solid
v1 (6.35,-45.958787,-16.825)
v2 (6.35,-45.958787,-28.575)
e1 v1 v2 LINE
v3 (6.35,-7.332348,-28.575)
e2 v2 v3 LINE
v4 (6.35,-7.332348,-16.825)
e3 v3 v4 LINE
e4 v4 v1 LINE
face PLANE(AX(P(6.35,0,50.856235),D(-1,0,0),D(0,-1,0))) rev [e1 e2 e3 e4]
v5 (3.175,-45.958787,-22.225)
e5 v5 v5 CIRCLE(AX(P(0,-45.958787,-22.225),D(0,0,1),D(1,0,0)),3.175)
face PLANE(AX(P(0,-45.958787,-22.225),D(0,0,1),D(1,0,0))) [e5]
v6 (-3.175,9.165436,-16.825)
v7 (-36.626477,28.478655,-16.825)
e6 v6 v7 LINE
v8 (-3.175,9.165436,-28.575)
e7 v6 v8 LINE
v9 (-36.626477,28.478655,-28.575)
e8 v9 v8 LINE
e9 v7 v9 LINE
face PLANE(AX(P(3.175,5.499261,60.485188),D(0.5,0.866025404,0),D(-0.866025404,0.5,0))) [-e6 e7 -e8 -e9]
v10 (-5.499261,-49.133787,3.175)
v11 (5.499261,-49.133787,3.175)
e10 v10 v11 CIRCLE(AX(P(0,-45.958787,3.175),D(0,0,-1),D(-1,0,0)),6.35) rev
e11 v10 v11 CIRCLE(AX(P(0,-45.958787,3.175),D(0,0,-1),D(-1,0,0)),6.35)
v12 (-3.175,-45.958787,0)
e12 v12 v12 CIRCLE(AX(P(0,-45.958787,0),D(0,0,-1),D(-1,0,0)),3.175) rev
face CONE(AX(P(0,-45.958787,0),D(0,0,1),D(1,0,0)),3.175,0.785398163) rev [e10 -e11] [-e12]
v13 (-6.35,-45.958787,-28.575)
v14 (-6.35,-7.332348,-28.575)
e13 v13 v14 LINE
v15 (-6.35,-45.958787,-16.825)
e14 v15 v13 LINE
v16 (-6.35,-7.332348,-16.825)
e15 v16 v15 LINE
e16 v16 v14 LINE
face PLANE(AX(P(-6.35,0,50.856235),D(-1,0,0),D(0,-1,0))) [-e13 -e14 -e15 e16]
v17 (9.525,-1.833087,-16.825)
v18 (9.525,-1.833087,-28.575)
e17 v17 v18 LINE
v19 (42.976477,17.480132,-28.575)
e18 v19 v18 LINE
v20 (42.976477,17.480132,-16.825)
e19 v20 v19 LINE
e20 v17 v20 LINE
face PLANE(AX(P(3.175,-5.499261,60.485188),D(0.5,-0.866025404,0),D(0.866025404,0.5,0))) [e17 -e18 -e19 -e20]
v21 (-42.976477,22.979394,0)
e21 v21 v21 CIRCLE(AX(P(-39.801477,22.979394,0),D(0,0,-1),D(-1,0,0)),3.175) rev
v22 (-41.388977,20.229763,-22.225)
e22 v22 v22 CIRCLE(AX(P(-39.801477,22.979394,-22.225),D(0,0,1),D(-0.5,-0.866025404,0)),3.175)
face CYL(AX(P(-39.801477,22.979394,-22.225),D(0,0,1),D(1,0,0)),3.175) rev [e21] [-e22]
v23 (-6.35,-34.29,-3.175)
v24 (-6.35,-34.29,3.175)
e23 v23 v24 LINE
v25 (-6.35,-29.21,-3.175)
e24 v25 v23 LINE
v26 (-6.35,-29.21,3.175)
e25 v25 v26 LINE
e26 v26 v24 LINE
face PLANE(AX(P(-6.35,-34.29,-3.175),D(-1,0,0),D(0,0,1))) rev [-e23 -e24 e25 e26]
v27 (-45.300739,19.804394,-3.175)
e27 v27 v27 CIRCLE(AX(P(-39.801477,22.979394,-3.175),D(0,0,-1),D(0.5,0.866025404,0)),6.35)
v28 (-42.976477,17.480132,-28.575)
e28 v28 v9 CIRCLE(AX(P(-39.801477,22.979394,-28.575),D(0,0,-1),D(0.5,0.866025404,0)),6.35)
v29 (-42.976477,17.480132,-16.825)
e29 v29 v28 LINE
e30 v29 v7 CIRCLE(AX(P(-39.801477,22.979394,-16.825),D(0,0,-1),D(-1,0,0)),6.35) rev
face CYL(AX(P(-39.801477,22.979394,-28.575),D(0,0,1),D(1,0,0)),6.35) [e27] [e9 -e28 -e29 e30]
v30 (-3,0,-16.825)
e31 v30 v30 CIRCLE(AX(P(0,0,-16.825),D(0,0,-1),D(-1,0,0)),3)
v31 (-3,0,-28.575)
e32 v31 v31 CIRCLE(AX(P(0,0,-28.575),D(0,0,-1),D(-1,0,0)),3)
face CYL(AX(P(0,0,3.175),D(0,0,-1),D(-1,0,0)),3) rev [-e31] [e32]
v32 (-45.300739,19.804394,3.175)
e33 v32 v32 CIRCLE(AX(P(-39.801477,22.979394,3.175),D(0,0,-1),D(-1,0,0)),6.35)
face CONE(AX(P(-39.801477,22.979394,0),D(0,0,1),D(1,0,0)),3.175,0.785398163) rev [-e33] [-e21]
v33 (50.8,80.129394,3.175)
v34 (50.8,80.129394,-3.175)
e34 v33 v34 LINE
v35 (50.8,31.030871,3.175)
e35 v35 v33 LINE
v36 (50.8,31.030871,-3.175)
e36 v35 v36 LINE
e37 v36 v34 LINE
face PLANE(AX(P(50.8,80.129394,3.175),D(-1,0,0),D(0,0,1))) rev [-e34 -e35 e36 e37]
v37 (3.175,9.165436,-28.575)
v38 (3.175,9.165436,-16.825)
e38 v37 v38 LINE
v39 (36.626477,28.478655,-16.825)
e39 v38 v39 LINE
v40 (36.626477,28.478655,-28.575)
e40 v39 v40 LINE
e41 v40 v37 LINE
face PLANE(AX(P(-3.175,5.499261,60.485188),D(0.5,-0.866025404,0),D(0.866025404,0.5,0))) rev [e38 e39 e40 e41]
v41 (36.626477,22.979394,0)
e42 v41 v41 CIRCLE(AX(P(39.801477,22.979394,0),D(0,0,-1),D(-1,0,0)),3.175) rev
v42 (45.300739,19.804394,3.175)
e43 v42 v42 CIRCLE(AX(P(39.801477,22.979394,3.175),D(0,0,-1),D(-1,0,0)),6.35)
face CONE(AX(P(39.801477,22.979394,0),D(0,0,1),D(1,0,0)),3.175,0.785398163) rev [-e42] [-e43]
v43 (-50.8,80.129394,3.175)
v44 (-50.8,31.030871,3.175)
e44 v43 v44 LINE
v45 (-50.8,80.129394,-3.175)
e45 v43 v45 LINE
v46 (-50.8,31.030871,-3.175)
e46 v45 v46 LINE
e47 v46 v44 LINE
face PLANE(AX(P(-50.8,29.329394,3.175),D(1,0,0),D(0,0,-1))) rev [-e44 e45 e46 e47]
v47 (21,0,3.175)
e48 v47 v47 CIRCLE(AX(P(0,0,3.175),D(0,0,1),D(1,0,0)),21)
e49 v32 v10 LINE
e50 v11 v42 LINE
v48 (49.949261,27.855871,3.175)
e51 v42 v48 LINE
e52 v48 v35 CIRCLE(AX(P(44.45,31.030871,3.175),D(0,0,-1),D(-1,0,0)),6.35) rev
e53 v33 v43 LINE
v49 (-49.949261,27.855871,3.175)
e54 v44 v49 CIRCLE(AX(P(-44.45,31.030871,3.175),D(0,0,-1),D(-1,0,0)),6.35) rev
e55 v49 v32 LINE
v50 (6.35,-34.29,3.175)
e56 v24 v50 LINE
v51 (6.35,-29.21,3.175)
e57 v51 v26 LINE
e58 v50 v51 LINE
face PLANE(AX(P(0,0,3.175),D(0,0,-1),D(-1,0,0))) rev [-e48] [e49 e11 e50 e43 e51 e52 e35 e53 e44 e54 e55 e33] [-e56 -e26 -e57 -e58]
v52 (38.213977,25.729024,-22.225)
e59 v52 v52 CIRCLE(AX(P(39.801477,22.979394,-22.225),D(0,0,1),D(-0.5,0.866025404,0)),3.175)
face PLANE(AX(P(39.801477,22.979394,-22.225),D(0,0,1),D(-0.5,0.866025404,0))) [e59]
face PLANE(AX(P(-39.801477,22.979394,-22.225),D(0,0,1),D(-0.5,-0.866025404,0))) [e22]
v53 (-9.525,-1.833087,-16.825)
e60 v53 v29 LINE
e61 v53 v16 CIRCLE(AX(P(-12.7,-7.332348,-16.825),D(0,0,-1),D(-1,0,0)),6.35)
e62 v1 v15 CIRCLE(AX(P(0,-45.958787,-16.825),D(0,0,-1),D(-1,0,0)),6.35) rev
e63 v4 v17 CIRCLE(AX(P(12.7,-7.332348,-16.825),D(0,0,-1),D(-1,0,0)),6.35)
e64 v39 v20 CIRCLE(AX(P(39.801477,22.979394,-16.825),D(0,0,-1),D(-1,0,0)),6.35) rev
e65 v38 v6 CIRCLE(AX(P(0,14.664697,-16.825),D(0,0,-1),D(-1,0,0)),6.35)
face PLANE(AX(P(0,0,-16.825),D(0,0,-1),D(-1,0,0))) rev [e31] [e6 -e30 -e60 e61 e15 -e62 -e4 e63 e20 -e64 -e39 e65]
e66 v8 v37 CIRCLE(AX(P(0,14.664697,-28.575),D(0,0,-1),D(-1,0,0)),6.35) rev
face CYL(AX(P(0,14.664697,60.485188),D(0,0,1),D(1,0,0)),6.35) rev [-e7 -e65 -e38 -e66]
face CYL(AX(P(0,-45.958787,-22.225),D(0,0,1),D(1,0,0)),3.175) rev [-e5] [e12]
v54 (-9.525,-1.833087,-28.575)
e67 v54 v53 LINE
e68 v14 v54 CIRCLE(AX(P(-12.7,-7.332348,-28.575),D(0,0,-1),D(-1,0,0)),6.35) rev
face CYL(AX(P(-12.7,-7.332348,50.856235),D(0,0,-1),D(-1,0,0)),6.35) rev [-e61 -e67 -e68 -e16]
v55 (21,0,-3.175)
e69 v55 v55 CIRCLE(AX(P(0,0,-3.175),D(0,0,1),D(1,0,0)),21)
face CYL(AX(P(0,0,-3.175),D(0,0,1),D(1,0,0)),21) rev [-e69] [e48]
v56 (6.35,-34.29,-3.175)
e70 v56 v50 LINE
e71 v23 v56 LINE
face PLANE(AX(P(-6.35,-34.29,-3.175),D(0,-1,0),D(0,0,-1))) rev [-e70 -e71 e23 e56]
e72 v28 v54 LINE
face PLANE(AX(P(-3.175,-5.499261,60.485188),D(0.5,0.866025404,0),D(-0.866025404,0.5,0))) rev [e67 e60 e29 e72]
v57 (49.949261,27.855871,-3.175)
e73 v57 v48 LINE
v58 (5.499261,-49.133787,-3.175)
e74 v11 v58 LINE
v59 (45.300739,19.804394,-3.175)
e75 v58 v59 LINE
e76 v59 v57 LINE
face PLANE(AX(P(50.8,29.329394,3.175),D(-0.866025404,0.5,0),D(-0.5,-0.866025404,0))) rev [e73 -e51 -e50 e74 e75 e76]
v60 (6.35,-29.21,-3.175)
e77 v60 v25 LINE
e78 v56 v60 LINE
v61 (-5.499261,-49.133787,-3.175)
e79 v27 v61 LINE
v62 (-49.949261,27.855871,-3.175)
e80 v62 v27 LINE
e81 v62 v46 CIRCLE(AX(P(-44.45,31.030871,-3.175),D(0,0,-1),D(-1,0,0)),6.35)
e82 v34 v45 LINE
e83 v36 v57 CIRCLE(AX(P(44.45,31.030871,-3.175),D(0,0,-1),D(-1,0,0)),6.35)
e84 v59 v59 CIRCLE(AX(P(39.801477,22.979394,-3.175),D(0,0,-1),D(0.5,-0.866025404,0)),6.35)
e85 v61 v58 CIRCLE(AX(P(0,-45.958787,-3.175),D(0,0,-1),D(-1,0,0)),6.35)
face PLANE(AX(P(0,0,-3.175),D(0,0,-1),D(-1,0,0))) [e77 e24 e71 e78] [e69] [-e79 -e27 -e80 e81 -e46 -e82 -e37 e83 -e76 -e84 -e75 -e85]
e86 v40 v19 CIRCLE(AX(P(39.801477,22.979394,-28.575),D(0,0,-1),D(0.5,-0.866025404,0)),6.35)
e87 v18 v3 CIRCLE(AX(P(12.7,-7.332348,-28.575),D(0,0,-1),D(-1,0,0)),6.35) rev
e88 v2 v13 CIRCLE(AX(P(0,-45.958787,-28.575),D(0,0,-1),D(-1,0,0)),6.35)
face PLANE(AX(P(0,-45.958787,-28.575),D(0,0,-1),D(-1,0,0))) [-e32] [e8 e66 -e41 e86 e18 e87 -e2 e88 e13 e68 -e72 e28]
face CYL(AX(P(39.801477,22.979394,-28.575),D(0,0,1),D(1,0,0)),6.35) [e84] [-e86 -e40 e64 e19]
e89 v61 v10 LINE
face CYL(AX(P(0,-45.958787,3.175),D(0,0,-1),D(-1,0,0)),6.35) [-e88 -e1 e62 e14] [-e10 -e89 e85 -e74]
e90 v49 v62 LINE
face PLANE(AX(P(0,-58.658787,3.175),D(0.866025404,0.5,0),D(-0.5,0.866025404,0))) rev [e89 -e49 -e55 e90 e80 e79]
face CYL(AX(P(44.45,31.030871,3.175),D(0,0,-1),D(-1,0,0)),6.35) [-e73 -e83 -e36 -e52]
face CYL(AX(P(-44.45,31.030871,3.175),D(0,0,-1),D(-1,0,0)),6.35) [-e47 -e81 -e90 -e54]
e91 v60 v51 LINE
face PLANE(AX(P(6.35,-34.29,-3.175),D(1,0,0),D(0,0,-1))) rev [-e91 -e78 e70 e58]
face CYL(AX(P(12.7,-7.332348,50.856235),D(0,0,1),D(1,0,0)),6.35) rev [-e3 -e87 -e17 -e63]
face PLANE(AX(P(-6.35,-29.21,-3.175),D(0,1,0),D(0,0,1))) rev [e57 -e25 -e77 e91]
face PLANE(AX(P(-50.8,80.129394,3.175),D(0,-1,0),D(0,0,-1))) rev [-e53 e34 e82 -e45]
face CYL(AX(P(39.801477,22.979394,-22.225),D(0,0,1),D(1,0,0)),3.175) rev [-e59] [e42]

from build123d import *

# Parameters (mm, degrees)
BOSS_EXTRUDE1_DEPTH          = 3.175
SKETCH2_R                    = 21
CUT_EXTRUDE1_DEPTH           = 96.087760678
FILLET1_R                    = 6.35
SKETCH3_W                    = 12.7
SKETCH3_H                    = 5.08
CUT_EXTRUDE2_DEPTH           = 96.087760678
SKETCH5_R                    = 6.35
BOSS_EXTRUDE3_DEPTH          = 25.4
SKETCH6_R                    = 3.175
CUT_EXTRUDE3_DEPTH           = 25.4
CHAMFER2_SIZE                = 3.175
BOSS_EXTRUDE4_START          = -11.75
BOSS_EXTRUDE4_DEPTH          = 11.75
CIRPATTERN2_COUNT            = 3
CHAMFER2_OF_CIRPATTERN2_SIZE = 3.175
FILLET2_R                    = 6.35
SKETCH9_R                    = 3
CUT_EXTRUDE4_DEPTH           = 101.047100061


with BuildPart() as part:
    # Sketch1 → Boss-Extrude1 (new, symmetric)
    with BuildSketch(Plane.XY):
        Polygon((0, -58.65878735), (-50.8, 29.329393675), (-50.8, 80.129393675), (50.8, 80.129393675), (50.8, 29.329393675), align=None)
    extrude(amount=BOSS_EXTRUDE1_DEPTH, both=True)

    # Sketch2 → Cut-Extrude1 (cut, through all)
    with BuildSketch(Plane.XY.offset(3.175)):
        Circle(SKETCH2_R)
    extrude(amount=-CUT_EXTRUDE1_DEPTH, mode=Mode.SUBTRACT)

    # Fillet1
    fillet1_edges = [part.edges().sort_by_distance(p)[0] for p in [
        (0, -58.65878735, 0),
        (-50.8, 29.329393675, 0),
        (50.8, 29.329393675, 0),
    ]]
    fillet(fillet1_edges, radius=FILLET1_R)

    # Sketch3 → Cut-Extrude2 (cut, through all)
    with BuildSketch(Plane.XY.offset(3.175)):
        with Locations((0, -31.75)):
            Rectangle(SKETCH3_W, SKETCH3_H)
    extrude(amount=-CUT_EXTRUDE2_DEPTH, mode=Mode.SUBTRACT)

    # Sketch5 → Boss-Extrude3 (add)
    with BuildSketch(Plane(origin=(0, 0, -3.175), x_dir=(-1, 0, 0), z_dir=(0, 0, -1))):
        with Locations((0, -45.95878735)):
            Circle(SKETCH5_R)
    boss_extrude3 = extrude(amount=BOSS_EXTRUDE3_DEPTH)

    # Sketch6 → Cut-Extrude3 (cut)
    with BuildSketch(Plane.XY.offset(3.175)):
        with Locations((0, -45.95878735)):
            Circle(SKETCH6_R)
    cut_extrude3 = extrude(amount=-CUT_EXTRUDE3_DEPTH, mode=Mode.SUBTRACT)

    # Chamfer2
    chamfer2_edges = [part.edges().sort_by_distance(p)[0] for p in [
        (-3.175, -45.95878735, 3.175),
    ]]
    chamfer(chamfer2_edges, length=CHAMFER2_SIZE - 0.0001)  # a hair under: the kernel refuses the full size

    # Sketch8 → Boss-Extrude4 (add)
    with BuildSketch(Plane(origin=(0, 0, -28.575), x_dir=(-1, 0, 0), z_dir=(0, 0, -1)).offset(BOSS_EXTRUDE4_START)):
        with BuildLine():
            Line((-6.35, 0), (-6.35, -45.95878735))
            ThreePointArc((-6.35, -45.95878735), (0, -39.60878735), (6.35, -45.95878735))
            Line((6.35, -45.95878735), (6.35, 0))
            Line((6.35, 0), (-6.35, 0))
        make_face()
    boss_extrude4 = extrude(amount=BOSS_EXTRUDE4_DEPTH)

    # CirPattern2: Boss-Extrude3, Cut-Extrude3, Boss-Extrude4 ×3 about axis
    cirpattern2_axis = Axis((0, 0, 0), (0, 0, 1))
    add([boss_extrude3.rotate(cirpattern2_axis, i * 360 / CIRPATTERN2_COUNT) for i in range(1, CIRPATTERN2_COUNT)])
    add([cut_extrude3.rotate(cirpattern2_axis, i * 360 / CIRPATTERN2_COUNT) for i in range(1, CIRPATTERN2_COUNT)], mode=Mode.SUBTRACT)
    add([boss_extrude4.rotate(cirpattern2_axis, i * 360 / CIRPATTERN2_COUNT) for i in range(1, CIRPATTERN2_COUNT)])

    # Chamfer2 of CirPattern2
    chamfer2_of_cirpattern2_edges = [part.edges().sort_by_distance(p)[0] for p in [
        (41.388977372, 20.229763018, 3.175),
        (-38.213977372, 25.729024332, 3.175),
    ]]
    chamfer(chamfer2_of_cirpattern2_edges, length=CHAMFER2_OF_CIRPATTERN2_SIZE - 0.0001)  # a hair under: the kernel refuses the full size

    # Fillet2
    fillet2_edges = [part.edges().sort_by_distance(p)[0] for p in [
        (-6.35, -3.666174209, -22.7),
        (0, 7.332348419, -22.7),
        (6.35, -3.666174209, -22.7),
    ]]
    fillet(fillet2_edges, radius=FILLET2_R)

    # Sketch9 → Cut-Extrude4 (cut, through all)
    with BuildSketch(Plane(origin=(0, 0, -28.575), x_dir=(-1, 0, 0), z_dir=(0, 0, -1))):
        Circle(SKETCH9_R)
    extrude(amount=-CUT_EXTRUDE4_DEPTH, mode=Mode.SUBTRACT)


solid = part.part
